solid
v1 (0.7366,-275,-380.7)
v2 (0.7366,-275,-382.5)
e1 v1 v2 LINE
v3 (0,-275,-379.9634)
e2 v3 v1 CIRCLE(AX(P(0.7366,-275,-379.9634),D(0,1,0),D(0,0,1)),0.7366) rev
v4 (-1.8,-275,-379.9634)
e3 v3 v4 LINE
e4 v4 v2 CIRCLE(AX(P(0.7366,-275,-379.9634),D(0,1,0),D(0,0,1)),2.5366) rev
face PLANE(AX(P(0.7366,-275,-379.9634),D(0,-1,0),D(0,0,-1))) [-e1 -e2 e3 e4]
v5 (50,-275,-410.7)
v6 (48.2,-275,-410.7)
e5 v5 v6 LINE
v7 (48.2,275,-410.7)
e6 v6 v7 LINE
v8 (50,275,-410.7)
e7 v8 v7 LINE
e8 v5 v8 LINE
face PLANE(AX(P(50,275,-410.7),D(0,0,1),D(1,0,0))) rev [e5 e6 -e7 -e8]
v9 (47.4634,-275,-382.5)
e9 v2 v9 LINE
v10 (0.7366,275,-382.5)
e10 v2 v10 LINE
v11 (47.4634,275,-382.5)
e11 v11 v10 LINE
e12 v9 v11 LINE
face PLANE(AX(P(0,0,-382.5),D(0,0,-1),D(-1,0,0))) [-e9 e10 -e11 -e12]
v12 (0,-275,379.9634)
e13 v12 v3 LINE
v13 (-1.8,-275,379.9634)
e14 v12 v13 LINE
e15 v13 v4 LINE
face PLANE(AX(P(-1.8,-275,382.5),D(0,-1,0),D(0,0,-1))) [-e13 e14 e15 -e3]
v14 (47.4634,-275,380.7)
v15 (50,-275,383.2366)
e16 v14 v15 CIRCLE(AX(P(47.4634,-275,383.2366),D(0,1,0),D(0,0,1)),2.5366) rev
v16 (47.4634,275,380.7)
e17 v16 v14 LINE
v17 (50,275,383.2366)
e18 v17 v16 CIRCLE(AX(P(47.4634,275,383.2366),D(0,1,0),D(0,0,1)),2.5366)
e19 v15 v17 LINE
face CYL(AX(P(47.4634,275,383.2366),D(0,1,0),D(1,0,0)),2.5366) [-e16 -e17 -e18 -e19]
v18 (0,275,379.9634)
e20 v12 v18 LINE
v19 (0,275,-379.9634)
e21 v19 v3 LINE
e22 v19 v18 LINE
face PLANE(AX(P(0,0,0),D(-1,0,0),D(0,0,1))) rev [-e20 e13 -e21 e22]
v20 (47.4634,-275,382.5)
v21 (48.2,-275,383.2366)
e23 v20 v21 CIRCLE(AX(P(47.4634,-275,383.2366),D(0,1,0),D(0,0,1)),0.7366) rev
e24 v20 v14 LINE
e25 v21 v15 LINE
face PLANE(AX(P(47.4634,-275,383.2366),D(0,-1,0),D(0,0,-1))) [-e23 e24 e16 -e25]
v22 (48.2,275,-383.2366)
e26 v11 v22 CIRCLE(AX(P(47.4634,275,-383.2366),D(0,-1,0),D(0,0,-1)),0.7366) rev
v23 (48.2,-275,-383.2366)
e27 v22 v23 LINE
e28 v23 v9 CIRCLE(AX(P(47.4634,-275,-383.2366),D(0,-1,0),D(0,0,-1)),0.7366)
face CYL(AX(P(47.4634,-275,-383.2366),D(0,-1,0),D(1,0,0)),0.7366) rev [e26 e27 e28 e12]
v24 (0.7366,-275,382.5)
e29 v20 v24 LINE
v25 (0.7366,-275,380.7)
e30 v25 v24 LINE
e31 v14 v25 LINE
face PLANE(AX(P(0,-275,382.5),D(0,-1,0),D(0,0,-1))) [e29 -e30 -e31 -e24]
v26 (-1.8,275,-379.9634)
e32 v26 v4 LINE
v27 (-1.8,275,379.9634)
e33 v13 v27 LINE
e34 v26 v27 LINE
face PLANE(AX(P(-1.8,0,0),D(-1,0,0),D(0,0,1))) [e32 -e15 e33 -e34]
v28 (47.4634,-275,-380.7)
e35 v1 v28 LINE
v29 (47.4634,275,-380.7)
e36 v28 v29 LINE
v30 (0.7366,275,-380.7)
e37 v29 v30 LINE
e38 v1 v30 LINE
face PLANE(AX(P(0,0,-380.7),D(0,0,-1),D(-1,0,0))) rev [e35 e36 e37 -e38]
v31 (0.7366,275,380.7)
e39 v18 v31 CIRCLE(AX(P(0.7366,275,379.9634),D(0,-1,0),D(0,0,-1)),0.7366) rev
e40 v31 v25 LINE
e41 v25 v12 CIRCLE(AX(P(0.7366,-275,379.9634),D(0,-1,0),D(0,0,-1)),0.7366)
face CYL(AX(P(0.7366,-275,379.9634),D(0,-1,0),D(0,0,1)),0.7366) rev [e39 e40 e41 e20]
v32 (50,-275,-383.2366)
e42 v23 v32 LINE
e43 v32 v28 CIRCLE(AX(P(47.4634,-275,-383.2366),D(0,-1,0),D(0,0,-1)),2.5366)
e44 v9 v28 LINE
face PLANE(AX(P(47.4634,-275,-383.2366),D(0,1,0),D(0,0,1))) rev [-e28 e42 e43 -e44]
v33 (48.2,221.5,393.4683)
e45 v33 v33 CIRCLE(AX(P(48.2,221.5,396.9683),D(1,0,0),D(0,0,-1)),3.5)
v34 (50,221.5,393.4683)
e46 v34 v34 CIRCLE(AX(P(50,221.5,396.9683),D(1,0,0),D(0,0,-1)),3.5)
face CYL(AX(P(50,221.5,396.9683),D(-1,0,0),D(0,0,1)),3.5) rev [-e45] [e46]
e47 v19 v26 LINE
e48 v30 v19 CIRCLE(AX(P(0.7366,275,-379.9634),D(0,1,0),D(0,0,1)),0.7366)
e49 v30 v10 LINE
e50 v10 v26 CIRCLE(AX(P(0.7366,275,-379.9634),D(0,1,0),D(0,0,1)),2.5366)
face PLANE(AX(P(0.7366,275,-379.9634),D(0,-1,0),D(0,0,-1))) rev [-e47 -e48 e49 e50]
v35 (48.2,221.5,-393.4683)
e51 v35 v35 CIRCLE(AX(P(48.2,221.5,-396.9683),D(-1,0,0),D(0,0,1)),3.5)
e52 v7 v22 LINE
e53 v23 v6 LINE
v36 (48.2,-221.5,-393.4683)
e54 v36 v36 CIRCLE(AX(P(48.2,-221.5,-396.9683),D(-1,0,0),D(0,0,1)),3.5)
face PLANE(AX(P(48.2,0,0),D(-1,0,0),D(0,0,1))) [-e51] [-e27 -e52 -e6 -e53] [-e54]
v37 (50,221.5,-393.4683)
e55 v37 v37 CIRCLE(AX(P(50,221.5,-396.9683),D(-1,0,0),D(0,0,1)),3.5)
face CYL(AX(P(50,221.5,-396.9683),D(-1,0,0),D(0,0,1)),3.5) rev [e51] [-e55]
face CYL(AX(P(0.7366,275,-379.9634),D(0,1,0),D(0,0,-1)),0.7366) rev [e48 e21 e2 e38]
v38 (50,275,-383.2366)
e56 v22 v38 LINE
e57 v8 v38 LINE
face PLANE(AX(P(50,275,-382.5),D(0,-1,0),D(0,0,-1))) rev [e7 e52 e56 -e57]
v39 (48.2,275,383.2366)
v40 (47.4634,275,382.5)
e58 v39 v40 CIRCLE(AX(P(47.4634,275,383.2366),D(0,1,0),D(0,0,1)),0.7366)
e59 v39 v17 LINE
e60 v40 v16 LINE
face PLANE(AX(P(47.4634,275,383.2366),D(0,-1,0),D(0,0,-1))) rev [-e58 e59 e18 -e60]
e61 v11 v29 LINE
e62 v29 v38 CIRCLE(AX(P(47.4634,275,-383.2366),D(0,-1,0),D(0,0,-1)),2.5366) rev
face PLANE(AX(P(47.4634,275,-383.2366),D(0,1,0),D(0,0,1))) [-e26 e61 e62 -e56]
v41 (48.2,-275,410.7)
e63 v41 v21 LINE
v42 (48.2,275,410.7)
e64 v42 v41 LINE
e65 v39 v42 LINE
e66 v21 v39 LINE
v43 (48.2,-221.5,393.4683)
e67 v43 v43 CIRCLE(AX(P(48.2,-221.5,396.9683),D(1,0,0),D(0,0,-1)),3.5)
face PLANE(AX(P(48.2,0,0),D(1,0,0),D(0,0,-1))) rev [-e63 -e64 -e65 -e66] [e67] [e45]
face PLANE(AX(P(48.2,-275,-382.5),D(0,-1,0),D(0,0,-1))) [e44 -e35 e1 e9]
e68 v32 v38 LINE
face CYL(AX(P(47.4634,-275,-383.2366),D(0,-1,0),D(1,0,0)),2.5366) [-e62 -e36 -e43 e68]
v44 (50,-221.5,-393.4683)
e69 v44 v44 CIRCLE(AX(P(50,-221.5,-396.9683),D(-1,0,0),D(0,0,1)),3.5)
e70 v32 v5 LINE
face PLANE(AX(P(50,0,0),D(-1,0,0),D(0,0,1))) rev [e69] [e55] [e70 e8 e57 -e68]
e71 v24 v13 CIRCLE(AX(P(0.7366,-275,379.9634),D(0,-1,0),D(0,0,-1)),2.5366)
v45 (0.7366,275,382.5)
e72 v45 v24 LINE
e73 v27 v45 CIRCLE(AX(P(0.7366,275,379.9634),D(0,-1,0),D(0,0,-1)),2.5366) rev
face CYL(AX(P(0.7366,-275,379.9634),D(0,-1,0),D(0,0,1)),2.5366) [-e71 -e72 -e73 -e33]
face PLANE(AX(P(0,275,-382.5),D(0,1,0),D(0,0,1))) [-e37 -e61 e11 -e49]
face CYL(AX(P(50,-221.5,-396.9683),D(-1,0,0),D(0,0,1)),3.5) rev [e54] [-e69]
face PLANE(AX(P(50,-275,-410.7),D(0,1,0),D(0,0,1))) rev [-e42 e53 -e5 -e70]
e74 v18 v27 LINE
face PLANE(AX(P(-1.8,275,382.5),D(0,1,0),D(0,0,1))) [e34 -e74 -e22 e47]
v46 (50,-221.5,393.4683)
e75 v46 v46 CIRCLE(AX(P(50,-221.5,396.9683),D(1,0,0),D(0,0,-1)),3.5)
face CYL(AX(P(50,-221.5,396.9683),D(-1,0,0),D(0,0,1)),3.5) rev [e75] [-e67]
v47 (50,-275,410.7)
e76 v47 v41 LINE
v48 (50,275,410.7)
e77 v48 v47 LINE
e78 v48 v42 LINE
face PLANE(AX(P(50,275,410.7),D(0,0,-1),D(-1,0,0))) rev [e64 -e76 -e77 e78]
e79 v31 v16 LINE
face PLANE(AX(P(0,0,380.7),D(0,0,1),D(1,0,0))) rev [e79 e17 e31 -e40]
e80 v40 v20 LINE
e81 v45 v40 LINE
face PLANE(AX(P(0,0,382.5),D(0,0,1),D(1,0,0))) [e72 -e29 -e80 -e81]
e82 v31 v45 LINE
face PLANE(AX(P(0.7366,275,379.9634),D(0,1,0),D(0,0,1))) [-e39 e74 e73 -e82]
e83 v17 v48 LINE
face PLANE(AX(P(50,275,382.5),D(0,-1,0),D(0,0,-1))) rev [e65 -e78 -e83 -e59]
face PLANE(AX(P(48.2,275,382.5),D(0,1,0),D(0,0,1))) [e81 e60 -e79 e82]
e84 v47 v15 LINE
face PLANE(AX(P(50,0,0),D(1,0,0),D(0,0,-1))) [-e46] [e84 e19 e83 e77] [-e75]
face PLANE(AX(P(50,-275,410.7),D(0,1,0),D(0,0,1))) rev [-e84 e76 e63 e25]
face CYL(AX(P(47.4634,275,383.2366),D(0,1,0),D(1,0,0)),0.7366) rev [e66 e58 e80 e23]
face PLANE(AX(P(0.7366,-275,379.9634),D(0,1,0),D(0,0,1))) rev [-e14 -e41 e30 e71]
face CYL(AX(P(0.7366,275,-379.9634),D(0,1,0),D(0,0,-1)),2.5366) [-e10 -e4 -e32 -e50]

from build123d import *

# Parameters (mm, degrees)
SKETCH1_W                      = 765
SKETCH1_H                      = 550
BASE_FLANGE1_DEPTH             = 1.8
EDGE_FLANGE1_STRIP_W           = 8.6732
EDGE_FLANGE1_STRIP_H           = 1.8
EDGE_FLANGE1_STRIP_CUT_DEPTH   = 550
EDGE_FLANGE1_STRIP_2_W         = 8.6732
EDGE_FLANGE1_STRIP_2_H         = 1.8
EDGE_FLANGE1_STRIP_CUT_2_DEPTH = 550
EDGE_FLANGE1_DEPTH             = 550
EDGE_FLANGE1_BEND_DEPTH        = 550
EDGE_FLANGE2_STRIP_W           = 8.6732
EDGE_FLANGE2_STRIP_H           = 1.8
EDGE_FLANGE2_STRIP_CUT_DEPTH   = 550
EDGE_FLANGE2_STRIP_2_W         = 8.6732
EDGE_FLANGE2_STRIP_2_H         = 1.8
EDGE_FLANGE2_STRIP_CUT_2_DEPTH = 550
EDGE_FLANGE2_DEPTH             = 550
EDGE_FLANGE2_BEND_DEPTH        = 550
SKETCH18_R                     = 3.5
CUT_EXTRUDE1_DEPTH             = 10


# Sheet-metal steps are written as plain solids
with BuildPart() as part:
    # Sketch1 → Base-Flange1 (new body)
    with BuildSketch(Plane(origin=(0, 0, 0), x_dir=(0, 0, -1), z_dir=(1, 0, 0))):
        Rectangle(SKETCH1_W, SKETCH1_H)
    extrude(amount=-BASE_FLANGE1_DEPTH)

    # Edge-Flange1 strip (across the edge) → Edge-Flange1 strip cut (cut)
    with BuildSketch(Plane(origin=(0, 275, 382.5), x_dir=(0, 0, -1), z_dir=(0, -1, 0))):
        with Locations((-1.8, -0.9)):
            Rectangle(EDGE_FLANGE1_STRIP_W, EDGE_FLANGE1_STRIP_H)
    extrude(amount=EDGE_FLANGE1_STRIP_CUT_DEPTH, mode=Mode.SUBTRACT)

    # Edge-Flange1 strip 2 (across the edge) → Edge-Flange1 strip cut 2 (cut)
    with BuildSketch(Plane(origin=(0, -275, -382.5), x_dir=(0, 0, 1), z_dir=(0, 1, 0))):
        with Locations((-1.8, -0.9)):
            Rectangle(EDGE_FLANGE1_STRIP_2_W, EDGE_FLANGE1_STRIP_2_H)
    extrude(amount=EDGE_FLANGE1_STRIP_CUT_2_DEPTH, mode=Mode.SUBTRACT)

    # Edge-Flange1 section (across the edge) → Edge-Flange1 (add)
    with BuildSketch(Plane(origin=(0, 275, 382.5), x_dir=(0, 0, -1), z_dir=(0, -1, 0))):
        with BuildLine():
            Line((0, 0.7366), (0, 48.2))
            Line((0, 48.2), (1.8, 48.2))
            Line((1.8, 48.2), (1.8, 0.7366))
            ThreePointArc((1.8, 0.7366), (2.015745145, 0.215745145), (2.5366, 0))
            Line((2.5366, 0), (2.5366, -1.8))
            ThreePointArc((2.5366, -1.8), (0.742952939, -1.057047061), (0, 0.7366))
        make_face()
    extrude(amount=EDGE_FLANGE1_DEPTH)

    # Edge-Flange1 section 2 (across the edge) → Edge-Flange1 bend (add)
    with BuildSketch(Plane(origin=(0, -275, -382.5), x_dir=(0, 0, 1), z_dir=(0, 1, 0))):
        with BuildLine():
            Line((0, 0.7366), (0, 48.2))
            Line((0, 48.2), (1.8, 48.2))
            Line((1.8, 48.2), (1.8, 0.7366))
            ThreePointArc((1.8, 0.7366), (2.015745145, 0.215745145), (2.5366, 0))
            Line((2.5366, 0), (2.5366, -1.8))
            ThreePointArc((2.5366, -1.8), (0.742952939, -1.057047061), (0, 0.7366))
        make_face()
    extrude(amount=EDGE_FLANGE1_BEND_DEPTH)

    # Edge-Flange2 strip (across the edge) → Edge-Flange2 strip cut (cut)
    with BuildSketch(Plane(origin=(48.2, 275, -382.5), x_dir=(-1, 0, 0), z_dir=(0, -1, 0))):
        with Locations((-3.6, -0.9)):
            Rectangle(EDGE_FLANGE2_STRIP_W, EDGE_FLANGE2_STRIP_H)
    extrude(amount=EDGE_FLANGE2_STRIP_CUT_DEPTH, mode=Mode.SUBTRACT)

    # Edge-Flange2 strip 2 (across the edge) → Edge-Flange2 strip cut 2 (cut)
    with BuildSketch(Plane(origin=(48.2, -275, 382.5), x_dir=(-1, 0, 0), z_dir=(0, 1, 0))):
        with Locations((-3.6, -0.9)):
            Rectangle(EDGE_FLANGE2_STRIP_2_W, EDGE_FLANGE2_STRIP_2_H)
    extrude(amount=EDGE_FLANGE2_STRIP_CUT_2_DEPTH, mode=Mode.SUBTRACT)

    # Edge-Flange2 section (across the edge) → Edge-Flange2 (add)
    with BuildSketch(Plane(origin=(48.2, 275, -382.5), x_dir=(-1, 0, 0), z_dir=(0, -1, 0))):
        with BuildLine():
            Line((-1.8, 0.7366), (-1.8, 28.2))
            Line((-1.8, 28.2), (0, 28.2))
            Line((0, 28.2), (0, 0.7366))
            ThreePointArc((0, 0.7366), (0.215745145, 0.215745145), (0.7366, 0))
            Line((0.7366, 0), (0.7366, -1.8))
            ThreePointArc((0.7366, -1.8), (-1.057047061, -1.057047061), (-1.8, 0.7366))
        make_face()
    extrude(amount=EDGE_FLANGE2_DEPTH)

    # Edge-Flange2 section 2 (across the edge) → Edge-Flange2 bend (add)
    with BuildSketch(Plane(origin=(48.2, -275, 382.5), x_dir=(-1, 0, 0), z_dir=(0, 1, 0))):
        with BuildLine():
            Line((-1.8, 0.7366), (-1.8, 28.2))
            Line((-1.8, 28.2), (0, 28.2))
            Line((0, 28.2), (0, 0.7366))
            ThreePointArc((0, 0.7366), (0.215745145, 0.215745145), (0.7366, 0))
            Line((0.7366, 0), (0.7366, -1.8))
            ThreePointArc((0.7366, -1.8), (-1.057047061, -1.057047061), (-1.8, 0.7366))
        make_face()
    extrude(amount=EDGE_FLANGE2_BEND_DEPTH)

    # Sketch18 → Cut-Extrude1 (cut)
    with BuildSketch(Plane.ZY.offset(-48.2)):
        with Locations((-396.9683, 221.5)):
            Circle(SKETCH18_R)
        with Locations((-396.9683, -221.5)):
            Circle(SKETCH18_R)
    cut_extrude1 = extrude(amount=-CUT_EXTRUDE1_DEPTH, mode=Mode.SUBTRACT)

    # Mirror1: Cut-Extrude1 across plane
    add(cut_extrude1.mirror(Plane.XY), mode=Mode.SUBTRACT)


solid = part.part
